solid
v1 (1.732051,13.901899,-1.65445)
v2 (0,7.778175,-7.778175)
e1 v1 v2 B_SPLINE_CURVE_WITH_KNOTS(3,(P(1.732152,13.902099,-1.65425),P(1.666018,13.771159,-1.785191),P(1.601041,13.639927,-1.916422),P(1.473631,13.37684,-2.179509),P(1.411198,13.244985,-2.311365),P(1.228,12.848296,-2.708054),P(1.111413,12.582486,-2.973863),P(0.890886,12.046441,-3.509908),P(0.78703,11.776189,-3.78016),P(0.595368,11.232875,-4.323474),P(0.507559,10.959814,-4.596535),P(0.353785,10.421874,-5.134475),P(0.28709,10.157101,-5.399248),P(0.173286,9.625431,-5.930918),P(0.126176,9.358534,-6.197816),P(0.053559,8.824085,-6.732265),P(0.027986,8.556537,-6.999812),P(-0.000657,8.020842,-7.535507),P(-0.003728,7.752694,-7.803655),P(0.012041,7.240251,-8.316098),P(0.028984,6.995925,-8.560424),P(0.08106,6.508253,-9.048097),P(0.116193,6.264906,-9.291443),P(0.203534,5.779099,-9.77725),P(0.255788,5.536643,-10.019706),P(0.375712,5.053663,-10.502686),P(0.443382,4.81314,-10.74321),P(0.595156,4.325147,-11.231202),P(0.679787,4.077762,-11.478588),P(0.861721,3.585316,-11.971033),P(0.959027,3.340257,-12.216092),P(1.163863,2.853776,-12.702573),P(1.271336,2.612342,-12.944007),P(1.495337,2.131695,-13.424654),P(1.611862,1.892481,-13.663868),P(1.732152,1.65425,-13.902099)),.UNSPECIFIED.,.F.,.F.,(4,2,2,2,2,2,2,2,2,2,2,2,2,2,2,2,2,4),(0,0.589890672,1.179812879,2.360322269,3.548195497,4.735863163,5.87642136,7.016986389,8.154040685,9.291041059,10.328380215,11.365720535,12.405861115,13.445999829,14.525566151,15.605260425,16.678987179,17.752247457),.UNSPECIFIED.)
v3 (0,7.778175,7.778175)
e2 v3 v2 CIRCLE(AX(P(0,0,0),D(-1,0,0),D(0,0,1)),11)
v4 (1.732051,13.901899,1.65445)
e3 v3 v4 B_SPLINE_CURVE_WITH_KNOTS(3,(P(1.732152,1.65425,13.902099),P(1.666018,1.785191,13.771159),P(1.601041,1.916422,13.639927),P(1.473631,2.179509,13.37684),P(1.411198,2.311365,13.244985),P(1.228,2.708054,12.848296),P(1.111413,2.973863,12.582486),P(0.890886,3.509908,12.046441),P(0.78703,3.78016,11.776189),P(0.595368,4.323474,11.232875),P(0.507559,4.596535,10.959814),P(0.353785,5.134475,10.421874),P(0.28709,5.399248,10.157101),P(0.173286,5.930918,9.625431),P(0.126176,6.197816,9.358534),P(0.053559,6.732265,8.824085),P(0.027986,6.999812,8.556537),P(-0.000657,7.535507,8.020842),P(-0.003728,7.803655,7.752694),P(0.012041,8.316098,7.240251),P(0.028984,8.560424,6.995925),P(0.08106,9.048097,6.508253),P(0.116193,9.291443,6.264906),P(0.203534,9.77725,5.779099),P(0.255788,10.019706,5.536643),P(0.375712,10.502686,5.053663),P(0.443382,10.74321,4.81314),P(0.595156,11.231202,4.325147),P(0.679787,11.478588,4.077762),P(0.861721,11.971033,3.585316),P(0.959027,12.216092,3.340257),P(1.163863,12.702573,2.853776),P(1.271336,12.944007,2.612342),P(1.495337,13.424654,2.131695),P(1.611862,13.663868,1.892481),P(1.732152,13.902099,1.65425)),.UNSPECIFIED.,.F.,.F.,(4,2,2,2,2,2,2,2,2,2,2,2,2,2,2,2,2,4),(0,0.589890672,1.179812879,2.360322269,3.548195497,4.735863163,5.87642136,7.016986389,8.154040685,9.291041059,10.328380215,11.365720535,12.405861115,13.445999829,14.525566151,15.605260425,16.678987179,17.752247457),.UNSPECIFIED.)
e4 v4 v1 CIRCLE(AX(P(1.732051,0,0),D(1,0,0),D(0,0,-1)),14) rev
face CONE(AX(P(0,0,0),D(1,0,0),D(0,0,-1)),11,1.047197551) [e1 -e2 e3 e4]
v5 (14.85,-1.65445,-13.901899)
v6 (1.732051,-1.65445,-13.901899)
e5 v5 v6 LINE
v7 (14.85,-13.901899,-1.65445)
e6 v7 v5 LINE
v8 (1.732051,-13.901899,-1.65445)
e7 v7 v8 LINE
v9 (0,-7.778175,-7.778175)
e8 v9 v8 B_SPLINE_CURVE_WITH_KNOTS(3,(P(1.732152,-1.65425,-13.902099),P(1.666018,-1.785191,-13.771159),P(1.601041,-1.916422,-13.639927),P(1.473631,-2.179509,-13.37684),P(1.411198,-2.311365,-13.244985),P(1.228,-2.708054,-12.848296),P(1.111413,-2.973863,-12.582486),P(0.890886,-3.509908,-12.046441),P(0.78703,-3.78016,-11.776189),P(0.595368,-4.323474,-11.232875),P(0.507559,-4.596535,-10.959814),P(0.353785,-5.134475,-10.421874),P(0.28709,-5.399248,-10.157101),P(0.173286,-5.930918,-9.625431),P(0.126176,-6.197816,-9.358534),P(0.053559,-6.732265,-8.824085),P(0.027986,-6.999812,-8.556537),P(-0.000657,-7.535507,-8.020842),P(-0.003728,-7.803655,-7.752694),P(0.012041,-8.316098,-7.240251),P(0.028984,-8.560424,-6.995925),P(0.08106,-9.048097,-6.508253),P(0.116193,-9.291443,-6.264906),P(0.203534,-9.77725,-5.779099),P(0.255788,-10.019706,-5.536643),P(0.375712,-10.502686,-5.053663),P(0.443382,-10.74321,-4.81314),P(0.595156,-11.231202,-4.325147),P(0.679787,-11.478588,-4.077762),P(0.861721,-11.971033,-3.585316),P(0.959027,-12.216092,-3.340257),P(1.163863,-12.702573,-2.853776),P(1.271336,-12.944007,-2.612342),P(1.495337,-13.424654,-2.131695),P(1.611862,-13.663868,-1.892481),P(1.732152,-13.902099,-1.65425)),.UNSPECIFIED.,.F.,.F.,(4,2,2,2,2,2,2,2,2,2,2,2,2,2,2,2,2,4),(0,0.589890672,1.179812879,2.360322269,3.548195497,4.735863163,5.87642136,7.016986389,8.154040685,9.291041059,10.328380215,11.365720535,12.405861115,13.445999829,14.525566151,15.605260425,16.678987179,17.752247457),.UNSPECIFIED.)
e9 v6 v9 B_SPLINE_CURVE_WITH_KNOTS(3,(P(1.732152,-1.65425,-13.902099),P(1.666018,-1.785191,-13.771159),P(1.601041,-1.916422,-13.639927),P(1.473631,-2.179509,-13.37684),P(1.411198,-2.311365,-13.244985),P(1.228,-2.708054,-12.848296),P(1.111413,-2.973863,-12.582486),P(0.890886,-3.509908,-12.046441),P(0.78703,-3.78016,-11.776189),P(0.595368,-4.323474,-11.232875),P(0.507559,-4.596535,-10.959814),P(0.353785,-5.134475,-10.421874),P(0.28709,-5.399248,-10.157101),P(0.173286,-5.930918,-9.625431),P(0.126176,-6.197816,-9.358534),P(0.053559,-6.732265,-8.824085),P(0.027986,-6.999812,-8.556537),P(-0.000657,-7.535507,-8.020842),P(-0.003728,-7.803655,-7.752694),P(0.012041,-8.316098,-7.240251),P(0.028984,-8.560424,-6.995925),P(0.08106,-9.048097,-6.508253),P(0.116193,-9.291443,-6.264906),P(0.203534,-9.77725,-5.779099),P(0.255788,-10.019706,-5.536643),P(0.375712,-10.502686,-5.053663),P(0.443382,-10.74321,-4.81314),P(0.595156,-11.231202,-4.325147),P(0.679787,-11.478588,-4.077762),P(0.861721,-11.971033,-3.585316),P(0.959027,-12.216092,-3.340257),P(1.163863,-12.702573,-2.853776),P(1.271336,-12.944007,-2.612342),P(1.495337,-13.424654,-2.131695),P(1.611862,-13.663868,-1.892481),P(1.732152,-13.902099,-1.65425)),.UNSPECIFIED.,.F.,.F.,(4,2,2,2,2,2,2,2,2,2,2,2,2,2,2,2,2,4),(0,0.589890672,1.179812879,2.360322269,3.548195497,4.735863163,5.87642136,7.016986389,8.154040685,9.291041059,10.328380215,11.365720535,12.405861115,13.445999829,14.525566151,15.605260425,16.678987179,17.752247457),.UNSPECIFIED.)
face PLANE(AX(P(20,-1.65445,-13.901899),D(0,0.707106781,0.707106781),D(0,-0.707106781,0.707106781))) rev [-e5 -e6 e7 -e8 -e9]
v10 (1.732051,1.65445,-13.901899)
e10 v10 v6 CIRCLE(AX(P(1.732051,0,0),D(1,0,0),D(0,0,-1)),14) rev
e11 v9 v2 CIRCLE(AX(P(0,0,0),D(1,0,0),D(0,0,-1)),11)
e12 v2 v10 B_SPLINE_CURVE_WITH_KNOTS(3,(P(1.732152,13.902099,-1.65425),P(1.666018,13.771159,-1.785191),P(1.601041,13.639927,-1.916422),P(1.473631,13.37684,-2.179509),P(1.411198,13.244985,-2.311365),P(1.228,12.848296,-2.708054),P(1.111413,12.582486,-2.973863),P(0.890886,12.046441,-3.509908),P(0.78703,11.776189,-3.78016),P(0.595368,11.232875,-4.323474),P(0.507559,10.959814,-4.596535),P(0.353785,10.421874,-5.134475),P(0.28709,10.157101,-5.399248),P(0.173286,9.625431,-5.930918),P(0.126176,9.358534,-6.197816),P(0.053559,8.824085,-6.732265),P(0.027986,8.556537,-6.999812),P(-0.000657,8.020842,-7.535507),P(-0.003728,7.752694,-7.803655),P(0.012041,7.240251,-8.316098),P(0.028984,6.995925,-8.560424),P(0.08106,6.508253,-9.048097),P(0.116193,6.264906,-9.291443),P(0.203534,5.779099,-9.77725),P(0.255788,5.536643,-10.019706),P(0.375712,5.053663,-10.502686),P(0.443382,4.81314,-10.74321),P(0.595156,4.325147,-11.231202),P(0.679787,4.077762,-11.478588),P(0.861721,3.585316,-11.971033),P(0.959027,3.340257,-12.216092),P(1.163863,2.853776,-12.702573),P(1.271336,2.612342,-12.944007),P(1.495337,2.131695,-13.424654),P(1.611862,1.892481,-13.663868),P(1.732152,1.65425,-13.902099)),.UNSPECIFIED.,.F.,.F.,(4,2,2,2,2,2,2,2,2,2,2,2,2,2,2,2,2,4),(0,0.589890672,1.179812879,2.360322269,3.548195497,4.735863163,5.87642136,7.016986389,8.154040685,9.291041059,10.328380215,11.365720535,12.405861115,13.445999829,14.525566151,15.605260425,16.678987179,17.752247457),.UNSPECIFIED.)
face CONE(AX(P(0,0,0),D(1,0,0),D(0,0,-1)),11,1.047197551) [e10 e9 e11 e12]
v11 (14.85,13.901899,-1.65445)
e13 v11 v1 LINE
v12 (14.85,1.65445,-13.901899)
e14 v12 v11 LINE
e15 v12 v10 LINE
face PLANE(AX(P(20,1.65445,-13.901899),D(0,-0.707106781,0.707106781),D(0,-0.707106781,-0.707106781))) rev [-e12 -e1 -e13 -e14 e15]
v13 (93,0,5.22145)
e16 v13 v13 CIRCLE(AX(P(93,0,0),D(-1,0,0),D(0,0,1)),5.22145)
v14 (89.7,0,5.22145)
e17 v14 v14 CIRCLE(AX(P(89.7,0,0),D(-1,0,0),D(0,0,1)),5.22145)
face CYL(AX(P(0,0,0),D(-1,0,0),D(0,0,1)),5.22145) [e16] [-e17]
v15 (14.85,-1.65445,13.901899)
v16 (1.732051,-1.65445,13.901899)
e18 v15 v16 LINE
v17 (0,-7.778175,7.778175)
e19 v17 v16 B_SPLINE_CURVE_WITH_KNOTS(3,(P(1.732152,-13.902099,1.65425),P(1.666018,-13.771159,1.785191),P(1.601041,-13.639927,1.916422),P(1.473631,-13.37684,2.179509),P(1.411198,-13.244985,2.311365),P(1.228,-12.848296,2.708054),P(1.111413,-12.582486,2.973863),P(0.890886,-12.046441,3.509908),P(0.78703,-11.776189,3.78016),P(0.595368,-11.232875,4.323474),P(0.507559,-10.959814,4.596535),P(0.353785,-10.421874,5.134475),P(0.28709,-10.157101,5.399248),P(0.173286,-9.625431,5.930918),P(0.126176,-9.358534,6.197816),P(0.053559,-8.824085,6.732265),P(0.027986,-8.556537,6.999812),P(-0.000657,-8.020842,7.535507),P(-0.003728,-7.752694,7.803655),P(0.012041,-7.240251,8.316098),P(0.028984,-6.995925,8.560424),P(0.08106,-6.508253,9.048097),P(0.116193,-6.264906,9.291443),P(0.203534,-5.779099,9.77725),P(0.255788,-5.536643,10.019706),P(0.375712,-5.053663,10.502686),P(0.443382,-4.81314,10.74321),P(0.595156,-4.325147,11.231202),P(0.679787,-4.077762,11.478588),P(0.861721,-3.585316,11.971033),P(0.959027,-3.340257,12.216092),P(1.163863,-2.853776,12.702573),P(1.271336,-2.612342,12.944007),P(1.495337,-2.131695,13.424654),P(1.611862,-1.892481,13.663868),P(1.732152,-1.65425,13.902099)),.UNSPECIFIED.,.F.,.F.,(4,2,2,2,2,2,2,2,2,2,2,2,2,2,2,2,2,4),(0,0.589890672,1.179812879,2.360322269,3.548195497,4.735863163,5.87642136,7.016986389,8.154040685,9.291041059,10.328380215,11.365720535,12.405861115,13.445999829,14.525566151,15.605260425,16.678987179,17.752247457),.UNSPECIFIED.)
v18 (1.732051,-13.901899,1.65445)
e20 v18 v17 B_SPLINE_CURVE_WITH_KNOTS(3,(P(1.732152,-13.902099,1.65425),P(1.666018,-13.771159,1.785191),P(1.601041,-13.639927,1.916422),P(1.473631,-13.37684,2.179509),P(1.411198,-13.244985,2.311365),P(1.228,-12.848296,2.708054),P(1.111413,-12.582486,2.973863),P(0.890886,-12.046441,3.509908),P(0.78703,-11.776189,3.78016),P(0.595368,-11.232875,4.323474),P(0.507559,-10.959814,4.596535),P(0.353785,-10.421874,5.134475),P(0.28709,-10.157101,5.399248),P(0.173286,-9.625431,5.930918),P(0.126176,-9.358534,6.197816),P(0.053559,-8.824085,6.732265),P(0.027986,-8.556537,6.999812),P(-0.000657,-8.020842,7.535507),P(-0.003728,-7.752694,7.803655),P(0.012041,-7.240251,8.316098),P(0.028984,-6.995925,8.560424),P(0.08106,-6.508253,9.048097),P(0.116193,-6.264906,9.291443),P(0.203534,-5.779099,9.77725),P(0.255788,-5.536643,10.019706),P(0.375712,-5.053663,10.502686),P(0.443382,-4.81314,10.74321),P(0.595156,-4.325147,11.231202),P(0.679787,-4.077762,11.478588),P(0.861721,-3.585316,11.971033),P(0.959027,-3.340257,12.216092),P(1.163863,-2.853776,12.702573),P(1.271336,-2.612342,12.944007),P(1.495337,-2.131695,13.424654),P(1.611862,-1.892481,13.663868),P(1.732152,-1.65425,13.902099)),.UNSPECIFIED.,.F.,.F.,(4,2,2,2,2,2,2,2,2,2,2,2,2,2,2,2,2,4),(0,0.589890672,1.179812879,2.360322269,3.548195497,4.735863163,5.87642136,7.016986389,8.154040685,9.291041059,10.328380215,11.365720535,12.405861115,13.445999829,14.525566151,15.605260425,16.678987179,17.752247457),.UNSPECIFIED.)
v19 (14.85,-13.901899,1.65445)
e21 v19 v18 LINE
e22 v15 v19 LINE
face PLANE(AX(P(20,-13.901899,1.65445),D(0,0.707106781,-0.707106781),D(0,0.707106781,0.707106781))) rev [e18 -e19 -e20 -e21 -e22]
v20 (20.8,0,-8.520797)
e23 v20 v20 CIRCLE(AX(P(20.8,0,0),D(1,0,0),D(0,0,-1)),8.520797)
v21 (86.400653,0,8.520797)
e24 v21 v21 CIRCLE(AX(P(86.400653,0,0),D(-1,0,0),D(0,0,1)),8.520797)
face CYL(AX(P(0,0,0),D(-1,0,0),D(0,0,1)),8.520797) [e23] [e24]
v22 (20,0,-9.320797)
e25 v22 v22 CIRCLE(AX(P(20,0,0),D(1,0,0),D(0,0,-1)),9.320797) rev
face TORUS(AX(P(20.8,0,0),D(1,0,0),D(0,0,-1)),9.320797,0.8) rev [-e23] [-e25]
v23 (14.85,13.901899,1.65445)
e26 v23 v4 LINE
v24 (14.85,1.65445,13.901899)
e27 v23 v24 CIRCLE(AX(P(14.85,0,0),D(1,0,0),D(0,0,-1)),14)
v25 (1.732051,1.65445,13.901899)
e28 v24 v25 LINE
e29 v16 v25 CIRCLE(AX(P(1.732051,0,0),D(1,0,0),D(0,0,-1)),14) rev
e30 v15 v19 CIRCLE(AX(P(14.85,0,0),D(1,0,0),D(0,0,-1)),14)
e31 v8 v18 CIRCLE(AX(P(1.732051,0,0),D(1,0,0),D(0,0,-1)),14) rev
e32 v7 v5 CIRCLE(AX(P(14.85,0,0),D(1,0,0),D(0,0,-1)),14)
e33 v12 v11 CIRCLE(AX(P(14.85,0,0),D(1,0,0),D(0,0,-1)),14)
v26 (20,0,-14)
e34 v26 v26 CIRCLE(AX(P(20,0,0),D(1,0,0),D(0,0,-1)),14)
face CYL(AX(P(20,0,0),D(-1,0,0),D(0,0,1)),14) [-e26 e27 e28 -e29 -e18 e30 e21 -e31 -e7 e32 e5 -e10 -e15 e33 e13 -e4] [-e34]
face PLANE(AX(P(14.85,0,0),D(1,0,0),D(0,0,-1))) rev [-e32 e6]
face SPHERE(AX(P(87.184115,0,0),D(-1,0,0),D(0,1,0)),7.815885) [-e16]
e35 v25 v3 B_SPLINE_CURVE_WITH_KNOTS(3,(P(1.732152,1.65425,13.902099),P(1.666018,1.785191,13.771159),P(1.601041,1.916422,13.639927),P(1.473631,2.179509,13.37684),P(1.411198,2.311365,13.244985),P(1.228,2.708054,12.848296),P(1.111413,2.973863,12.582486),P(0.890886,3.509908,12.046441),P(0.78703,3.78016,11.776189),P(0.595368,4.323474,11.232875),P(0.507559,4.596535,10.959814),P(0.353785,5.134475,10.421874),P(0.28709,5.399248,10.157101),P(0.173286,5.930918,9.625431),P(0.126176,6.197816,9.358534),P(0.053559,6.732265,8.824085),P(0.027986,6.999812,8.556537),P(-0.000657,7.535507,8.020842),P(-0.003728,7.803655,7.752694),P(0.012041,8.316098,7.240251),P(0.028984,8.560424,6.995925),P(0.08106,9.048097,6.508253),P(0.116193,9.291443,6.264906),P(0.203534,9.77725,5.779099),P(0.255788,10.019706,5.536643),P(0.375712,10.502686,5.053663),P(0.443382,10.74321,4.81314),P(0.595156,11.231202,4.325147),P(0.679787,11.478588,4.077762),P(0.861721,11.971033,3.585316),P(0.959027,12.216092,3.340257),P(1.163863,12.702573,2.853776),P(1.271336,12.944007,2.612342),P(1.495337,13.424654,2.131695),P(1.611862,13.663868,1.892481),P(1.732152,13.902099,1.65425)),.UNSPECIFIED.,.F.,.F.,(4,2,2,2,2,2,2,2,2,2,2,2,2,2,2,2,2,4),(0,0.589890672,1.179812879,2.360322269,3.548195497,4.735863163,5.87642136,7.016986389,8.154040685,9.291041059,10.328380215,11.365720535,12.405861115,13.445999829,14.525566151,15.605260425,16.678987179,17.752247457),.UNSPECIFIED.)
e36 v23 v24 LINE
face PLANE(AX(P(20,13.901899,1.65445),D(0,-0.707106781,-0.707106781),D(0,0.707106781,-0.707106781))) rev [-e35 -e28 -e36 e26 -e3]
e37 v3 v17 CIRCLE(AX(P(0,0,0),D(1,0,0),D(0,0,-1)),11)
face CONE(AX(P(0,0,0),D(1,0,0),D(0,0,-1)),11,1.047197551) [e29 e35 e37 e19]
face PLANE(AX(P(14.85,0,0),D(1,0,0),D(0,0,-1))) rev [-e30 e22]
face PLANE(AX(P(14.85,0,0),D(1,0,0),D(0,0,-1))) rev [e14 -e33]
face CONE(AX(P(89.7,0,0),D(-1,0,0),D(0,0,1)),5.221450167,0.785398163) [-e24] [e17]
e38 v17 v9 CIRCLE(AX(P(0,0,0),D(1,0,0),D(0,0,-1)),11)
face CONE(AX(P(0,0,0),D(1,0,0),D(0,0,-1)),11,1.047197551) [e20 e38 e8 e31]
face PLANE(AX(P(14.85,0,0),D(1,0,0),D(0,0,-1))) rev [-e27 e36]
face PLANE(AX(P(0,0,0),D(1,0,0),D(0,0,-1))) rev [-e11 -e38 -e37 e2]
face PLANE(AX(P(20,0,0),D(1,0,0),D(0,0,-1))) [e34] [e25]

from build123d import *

# Parameters (mm, degrees)
BASEHEAD_DEPTH = 20
COLLAR_START   = -5.15
COLLARSKE_R    = 14
COLLAR_DEPTH   = 5.15
HEADFILLET_R   = 0.8


# Read off the part's stored shape, not the designer's step: HeadChamfer
with BuildPart() as part:
    # SquareSke → BaseHead (new body)
    with BuildSketch(Plane(origin=(0, 0, 0), x_dir=(0, 0, -1), z_dir=(1, 0, 0))):
        with BuildLine():
            Line((13.90189895, -1.654450236), (1.654450236, -13.90189895))
            ThreePointArc((1.654450236, -13.90189895), (0, -14), (-1.654450236, -13.90189895))
            Line((-1.654450236, -13.90189895), (-13.90189895, -1.654450236))
            ThreePointArc((-13.90189895, -1.654450236), (-14, 0), (-13.90189895, 1.654450236))
            Line((-13.90189895, 1.654450236), (-1.654450236, 13.90189895))
            ThreePointArc((-1.654450236, 13.90189895), (0, 14), (1.654450236, 13.90189895))
            Line((1.654450236, 13.90189895), (13.90189895, 1.654450236))
            ThreePointArc((13.90189895, 1.654450236), (14, 0), (13.90189895, -1.654450236))
        make_face()
    extrude(amount=BASEHEAD_DEPTH)

    # HeadChamfer outline → HeadChamfer (revolve, cut)
    with BuildSketch(Plane.YX):
        Polygon((14.000000007, 1.732050812), (11, 0), (14.000000007, 0), align=None)
    revolve(axis=Axis((0, 0, 0), (1, 0, 0)), mode=Mode.SUBTRACT)

    # HeadChamfer 2 outline → HeadChamfer 2 (revolve)
    with BuildSketch(Plane.YX):
        with BuildLine():
            Line((5.221450167, 89.7), (5.221450173, 92.999999995))
            ThreePointArc((5.221450173, 92.999999995), (2.79569052, 94.482893893), (0, 95))
            Line((0, 95), (0, 20))
            Line((0, 20), (8.520797289, 20))
            Line((8.520797289, 20), (8.520797289, 86.400652878))
            Line((8.520797289, 86.400652878), (5.221450167, 89.7))
        make_face()
    revolve(axis=Axis((0, 0, 0), (1, 0, 0)))

    # CollarSke → Collar (add)
    with BuildSketch(Plane(origin=(20, 0, 0), x_dir=(0, 0, -1), z_dir=(1, 0, 0)).offset(COLLAR_START)):
        with Locations(Location((0, 0, 0), (0, 0, 173.213210702))):
            Circle(COLLARSKE_R)
    extrude(amount=COLLAR_DEPTH)

    # HeadFillet
    headfillet_edges = [part.edges().sort_by_distance(p)[0] for p in [
        (20, -8.520797289, 0),
    ]]
    fillet(headfillet_edges, radius=HEADFILLET_R)


solid = part.part
